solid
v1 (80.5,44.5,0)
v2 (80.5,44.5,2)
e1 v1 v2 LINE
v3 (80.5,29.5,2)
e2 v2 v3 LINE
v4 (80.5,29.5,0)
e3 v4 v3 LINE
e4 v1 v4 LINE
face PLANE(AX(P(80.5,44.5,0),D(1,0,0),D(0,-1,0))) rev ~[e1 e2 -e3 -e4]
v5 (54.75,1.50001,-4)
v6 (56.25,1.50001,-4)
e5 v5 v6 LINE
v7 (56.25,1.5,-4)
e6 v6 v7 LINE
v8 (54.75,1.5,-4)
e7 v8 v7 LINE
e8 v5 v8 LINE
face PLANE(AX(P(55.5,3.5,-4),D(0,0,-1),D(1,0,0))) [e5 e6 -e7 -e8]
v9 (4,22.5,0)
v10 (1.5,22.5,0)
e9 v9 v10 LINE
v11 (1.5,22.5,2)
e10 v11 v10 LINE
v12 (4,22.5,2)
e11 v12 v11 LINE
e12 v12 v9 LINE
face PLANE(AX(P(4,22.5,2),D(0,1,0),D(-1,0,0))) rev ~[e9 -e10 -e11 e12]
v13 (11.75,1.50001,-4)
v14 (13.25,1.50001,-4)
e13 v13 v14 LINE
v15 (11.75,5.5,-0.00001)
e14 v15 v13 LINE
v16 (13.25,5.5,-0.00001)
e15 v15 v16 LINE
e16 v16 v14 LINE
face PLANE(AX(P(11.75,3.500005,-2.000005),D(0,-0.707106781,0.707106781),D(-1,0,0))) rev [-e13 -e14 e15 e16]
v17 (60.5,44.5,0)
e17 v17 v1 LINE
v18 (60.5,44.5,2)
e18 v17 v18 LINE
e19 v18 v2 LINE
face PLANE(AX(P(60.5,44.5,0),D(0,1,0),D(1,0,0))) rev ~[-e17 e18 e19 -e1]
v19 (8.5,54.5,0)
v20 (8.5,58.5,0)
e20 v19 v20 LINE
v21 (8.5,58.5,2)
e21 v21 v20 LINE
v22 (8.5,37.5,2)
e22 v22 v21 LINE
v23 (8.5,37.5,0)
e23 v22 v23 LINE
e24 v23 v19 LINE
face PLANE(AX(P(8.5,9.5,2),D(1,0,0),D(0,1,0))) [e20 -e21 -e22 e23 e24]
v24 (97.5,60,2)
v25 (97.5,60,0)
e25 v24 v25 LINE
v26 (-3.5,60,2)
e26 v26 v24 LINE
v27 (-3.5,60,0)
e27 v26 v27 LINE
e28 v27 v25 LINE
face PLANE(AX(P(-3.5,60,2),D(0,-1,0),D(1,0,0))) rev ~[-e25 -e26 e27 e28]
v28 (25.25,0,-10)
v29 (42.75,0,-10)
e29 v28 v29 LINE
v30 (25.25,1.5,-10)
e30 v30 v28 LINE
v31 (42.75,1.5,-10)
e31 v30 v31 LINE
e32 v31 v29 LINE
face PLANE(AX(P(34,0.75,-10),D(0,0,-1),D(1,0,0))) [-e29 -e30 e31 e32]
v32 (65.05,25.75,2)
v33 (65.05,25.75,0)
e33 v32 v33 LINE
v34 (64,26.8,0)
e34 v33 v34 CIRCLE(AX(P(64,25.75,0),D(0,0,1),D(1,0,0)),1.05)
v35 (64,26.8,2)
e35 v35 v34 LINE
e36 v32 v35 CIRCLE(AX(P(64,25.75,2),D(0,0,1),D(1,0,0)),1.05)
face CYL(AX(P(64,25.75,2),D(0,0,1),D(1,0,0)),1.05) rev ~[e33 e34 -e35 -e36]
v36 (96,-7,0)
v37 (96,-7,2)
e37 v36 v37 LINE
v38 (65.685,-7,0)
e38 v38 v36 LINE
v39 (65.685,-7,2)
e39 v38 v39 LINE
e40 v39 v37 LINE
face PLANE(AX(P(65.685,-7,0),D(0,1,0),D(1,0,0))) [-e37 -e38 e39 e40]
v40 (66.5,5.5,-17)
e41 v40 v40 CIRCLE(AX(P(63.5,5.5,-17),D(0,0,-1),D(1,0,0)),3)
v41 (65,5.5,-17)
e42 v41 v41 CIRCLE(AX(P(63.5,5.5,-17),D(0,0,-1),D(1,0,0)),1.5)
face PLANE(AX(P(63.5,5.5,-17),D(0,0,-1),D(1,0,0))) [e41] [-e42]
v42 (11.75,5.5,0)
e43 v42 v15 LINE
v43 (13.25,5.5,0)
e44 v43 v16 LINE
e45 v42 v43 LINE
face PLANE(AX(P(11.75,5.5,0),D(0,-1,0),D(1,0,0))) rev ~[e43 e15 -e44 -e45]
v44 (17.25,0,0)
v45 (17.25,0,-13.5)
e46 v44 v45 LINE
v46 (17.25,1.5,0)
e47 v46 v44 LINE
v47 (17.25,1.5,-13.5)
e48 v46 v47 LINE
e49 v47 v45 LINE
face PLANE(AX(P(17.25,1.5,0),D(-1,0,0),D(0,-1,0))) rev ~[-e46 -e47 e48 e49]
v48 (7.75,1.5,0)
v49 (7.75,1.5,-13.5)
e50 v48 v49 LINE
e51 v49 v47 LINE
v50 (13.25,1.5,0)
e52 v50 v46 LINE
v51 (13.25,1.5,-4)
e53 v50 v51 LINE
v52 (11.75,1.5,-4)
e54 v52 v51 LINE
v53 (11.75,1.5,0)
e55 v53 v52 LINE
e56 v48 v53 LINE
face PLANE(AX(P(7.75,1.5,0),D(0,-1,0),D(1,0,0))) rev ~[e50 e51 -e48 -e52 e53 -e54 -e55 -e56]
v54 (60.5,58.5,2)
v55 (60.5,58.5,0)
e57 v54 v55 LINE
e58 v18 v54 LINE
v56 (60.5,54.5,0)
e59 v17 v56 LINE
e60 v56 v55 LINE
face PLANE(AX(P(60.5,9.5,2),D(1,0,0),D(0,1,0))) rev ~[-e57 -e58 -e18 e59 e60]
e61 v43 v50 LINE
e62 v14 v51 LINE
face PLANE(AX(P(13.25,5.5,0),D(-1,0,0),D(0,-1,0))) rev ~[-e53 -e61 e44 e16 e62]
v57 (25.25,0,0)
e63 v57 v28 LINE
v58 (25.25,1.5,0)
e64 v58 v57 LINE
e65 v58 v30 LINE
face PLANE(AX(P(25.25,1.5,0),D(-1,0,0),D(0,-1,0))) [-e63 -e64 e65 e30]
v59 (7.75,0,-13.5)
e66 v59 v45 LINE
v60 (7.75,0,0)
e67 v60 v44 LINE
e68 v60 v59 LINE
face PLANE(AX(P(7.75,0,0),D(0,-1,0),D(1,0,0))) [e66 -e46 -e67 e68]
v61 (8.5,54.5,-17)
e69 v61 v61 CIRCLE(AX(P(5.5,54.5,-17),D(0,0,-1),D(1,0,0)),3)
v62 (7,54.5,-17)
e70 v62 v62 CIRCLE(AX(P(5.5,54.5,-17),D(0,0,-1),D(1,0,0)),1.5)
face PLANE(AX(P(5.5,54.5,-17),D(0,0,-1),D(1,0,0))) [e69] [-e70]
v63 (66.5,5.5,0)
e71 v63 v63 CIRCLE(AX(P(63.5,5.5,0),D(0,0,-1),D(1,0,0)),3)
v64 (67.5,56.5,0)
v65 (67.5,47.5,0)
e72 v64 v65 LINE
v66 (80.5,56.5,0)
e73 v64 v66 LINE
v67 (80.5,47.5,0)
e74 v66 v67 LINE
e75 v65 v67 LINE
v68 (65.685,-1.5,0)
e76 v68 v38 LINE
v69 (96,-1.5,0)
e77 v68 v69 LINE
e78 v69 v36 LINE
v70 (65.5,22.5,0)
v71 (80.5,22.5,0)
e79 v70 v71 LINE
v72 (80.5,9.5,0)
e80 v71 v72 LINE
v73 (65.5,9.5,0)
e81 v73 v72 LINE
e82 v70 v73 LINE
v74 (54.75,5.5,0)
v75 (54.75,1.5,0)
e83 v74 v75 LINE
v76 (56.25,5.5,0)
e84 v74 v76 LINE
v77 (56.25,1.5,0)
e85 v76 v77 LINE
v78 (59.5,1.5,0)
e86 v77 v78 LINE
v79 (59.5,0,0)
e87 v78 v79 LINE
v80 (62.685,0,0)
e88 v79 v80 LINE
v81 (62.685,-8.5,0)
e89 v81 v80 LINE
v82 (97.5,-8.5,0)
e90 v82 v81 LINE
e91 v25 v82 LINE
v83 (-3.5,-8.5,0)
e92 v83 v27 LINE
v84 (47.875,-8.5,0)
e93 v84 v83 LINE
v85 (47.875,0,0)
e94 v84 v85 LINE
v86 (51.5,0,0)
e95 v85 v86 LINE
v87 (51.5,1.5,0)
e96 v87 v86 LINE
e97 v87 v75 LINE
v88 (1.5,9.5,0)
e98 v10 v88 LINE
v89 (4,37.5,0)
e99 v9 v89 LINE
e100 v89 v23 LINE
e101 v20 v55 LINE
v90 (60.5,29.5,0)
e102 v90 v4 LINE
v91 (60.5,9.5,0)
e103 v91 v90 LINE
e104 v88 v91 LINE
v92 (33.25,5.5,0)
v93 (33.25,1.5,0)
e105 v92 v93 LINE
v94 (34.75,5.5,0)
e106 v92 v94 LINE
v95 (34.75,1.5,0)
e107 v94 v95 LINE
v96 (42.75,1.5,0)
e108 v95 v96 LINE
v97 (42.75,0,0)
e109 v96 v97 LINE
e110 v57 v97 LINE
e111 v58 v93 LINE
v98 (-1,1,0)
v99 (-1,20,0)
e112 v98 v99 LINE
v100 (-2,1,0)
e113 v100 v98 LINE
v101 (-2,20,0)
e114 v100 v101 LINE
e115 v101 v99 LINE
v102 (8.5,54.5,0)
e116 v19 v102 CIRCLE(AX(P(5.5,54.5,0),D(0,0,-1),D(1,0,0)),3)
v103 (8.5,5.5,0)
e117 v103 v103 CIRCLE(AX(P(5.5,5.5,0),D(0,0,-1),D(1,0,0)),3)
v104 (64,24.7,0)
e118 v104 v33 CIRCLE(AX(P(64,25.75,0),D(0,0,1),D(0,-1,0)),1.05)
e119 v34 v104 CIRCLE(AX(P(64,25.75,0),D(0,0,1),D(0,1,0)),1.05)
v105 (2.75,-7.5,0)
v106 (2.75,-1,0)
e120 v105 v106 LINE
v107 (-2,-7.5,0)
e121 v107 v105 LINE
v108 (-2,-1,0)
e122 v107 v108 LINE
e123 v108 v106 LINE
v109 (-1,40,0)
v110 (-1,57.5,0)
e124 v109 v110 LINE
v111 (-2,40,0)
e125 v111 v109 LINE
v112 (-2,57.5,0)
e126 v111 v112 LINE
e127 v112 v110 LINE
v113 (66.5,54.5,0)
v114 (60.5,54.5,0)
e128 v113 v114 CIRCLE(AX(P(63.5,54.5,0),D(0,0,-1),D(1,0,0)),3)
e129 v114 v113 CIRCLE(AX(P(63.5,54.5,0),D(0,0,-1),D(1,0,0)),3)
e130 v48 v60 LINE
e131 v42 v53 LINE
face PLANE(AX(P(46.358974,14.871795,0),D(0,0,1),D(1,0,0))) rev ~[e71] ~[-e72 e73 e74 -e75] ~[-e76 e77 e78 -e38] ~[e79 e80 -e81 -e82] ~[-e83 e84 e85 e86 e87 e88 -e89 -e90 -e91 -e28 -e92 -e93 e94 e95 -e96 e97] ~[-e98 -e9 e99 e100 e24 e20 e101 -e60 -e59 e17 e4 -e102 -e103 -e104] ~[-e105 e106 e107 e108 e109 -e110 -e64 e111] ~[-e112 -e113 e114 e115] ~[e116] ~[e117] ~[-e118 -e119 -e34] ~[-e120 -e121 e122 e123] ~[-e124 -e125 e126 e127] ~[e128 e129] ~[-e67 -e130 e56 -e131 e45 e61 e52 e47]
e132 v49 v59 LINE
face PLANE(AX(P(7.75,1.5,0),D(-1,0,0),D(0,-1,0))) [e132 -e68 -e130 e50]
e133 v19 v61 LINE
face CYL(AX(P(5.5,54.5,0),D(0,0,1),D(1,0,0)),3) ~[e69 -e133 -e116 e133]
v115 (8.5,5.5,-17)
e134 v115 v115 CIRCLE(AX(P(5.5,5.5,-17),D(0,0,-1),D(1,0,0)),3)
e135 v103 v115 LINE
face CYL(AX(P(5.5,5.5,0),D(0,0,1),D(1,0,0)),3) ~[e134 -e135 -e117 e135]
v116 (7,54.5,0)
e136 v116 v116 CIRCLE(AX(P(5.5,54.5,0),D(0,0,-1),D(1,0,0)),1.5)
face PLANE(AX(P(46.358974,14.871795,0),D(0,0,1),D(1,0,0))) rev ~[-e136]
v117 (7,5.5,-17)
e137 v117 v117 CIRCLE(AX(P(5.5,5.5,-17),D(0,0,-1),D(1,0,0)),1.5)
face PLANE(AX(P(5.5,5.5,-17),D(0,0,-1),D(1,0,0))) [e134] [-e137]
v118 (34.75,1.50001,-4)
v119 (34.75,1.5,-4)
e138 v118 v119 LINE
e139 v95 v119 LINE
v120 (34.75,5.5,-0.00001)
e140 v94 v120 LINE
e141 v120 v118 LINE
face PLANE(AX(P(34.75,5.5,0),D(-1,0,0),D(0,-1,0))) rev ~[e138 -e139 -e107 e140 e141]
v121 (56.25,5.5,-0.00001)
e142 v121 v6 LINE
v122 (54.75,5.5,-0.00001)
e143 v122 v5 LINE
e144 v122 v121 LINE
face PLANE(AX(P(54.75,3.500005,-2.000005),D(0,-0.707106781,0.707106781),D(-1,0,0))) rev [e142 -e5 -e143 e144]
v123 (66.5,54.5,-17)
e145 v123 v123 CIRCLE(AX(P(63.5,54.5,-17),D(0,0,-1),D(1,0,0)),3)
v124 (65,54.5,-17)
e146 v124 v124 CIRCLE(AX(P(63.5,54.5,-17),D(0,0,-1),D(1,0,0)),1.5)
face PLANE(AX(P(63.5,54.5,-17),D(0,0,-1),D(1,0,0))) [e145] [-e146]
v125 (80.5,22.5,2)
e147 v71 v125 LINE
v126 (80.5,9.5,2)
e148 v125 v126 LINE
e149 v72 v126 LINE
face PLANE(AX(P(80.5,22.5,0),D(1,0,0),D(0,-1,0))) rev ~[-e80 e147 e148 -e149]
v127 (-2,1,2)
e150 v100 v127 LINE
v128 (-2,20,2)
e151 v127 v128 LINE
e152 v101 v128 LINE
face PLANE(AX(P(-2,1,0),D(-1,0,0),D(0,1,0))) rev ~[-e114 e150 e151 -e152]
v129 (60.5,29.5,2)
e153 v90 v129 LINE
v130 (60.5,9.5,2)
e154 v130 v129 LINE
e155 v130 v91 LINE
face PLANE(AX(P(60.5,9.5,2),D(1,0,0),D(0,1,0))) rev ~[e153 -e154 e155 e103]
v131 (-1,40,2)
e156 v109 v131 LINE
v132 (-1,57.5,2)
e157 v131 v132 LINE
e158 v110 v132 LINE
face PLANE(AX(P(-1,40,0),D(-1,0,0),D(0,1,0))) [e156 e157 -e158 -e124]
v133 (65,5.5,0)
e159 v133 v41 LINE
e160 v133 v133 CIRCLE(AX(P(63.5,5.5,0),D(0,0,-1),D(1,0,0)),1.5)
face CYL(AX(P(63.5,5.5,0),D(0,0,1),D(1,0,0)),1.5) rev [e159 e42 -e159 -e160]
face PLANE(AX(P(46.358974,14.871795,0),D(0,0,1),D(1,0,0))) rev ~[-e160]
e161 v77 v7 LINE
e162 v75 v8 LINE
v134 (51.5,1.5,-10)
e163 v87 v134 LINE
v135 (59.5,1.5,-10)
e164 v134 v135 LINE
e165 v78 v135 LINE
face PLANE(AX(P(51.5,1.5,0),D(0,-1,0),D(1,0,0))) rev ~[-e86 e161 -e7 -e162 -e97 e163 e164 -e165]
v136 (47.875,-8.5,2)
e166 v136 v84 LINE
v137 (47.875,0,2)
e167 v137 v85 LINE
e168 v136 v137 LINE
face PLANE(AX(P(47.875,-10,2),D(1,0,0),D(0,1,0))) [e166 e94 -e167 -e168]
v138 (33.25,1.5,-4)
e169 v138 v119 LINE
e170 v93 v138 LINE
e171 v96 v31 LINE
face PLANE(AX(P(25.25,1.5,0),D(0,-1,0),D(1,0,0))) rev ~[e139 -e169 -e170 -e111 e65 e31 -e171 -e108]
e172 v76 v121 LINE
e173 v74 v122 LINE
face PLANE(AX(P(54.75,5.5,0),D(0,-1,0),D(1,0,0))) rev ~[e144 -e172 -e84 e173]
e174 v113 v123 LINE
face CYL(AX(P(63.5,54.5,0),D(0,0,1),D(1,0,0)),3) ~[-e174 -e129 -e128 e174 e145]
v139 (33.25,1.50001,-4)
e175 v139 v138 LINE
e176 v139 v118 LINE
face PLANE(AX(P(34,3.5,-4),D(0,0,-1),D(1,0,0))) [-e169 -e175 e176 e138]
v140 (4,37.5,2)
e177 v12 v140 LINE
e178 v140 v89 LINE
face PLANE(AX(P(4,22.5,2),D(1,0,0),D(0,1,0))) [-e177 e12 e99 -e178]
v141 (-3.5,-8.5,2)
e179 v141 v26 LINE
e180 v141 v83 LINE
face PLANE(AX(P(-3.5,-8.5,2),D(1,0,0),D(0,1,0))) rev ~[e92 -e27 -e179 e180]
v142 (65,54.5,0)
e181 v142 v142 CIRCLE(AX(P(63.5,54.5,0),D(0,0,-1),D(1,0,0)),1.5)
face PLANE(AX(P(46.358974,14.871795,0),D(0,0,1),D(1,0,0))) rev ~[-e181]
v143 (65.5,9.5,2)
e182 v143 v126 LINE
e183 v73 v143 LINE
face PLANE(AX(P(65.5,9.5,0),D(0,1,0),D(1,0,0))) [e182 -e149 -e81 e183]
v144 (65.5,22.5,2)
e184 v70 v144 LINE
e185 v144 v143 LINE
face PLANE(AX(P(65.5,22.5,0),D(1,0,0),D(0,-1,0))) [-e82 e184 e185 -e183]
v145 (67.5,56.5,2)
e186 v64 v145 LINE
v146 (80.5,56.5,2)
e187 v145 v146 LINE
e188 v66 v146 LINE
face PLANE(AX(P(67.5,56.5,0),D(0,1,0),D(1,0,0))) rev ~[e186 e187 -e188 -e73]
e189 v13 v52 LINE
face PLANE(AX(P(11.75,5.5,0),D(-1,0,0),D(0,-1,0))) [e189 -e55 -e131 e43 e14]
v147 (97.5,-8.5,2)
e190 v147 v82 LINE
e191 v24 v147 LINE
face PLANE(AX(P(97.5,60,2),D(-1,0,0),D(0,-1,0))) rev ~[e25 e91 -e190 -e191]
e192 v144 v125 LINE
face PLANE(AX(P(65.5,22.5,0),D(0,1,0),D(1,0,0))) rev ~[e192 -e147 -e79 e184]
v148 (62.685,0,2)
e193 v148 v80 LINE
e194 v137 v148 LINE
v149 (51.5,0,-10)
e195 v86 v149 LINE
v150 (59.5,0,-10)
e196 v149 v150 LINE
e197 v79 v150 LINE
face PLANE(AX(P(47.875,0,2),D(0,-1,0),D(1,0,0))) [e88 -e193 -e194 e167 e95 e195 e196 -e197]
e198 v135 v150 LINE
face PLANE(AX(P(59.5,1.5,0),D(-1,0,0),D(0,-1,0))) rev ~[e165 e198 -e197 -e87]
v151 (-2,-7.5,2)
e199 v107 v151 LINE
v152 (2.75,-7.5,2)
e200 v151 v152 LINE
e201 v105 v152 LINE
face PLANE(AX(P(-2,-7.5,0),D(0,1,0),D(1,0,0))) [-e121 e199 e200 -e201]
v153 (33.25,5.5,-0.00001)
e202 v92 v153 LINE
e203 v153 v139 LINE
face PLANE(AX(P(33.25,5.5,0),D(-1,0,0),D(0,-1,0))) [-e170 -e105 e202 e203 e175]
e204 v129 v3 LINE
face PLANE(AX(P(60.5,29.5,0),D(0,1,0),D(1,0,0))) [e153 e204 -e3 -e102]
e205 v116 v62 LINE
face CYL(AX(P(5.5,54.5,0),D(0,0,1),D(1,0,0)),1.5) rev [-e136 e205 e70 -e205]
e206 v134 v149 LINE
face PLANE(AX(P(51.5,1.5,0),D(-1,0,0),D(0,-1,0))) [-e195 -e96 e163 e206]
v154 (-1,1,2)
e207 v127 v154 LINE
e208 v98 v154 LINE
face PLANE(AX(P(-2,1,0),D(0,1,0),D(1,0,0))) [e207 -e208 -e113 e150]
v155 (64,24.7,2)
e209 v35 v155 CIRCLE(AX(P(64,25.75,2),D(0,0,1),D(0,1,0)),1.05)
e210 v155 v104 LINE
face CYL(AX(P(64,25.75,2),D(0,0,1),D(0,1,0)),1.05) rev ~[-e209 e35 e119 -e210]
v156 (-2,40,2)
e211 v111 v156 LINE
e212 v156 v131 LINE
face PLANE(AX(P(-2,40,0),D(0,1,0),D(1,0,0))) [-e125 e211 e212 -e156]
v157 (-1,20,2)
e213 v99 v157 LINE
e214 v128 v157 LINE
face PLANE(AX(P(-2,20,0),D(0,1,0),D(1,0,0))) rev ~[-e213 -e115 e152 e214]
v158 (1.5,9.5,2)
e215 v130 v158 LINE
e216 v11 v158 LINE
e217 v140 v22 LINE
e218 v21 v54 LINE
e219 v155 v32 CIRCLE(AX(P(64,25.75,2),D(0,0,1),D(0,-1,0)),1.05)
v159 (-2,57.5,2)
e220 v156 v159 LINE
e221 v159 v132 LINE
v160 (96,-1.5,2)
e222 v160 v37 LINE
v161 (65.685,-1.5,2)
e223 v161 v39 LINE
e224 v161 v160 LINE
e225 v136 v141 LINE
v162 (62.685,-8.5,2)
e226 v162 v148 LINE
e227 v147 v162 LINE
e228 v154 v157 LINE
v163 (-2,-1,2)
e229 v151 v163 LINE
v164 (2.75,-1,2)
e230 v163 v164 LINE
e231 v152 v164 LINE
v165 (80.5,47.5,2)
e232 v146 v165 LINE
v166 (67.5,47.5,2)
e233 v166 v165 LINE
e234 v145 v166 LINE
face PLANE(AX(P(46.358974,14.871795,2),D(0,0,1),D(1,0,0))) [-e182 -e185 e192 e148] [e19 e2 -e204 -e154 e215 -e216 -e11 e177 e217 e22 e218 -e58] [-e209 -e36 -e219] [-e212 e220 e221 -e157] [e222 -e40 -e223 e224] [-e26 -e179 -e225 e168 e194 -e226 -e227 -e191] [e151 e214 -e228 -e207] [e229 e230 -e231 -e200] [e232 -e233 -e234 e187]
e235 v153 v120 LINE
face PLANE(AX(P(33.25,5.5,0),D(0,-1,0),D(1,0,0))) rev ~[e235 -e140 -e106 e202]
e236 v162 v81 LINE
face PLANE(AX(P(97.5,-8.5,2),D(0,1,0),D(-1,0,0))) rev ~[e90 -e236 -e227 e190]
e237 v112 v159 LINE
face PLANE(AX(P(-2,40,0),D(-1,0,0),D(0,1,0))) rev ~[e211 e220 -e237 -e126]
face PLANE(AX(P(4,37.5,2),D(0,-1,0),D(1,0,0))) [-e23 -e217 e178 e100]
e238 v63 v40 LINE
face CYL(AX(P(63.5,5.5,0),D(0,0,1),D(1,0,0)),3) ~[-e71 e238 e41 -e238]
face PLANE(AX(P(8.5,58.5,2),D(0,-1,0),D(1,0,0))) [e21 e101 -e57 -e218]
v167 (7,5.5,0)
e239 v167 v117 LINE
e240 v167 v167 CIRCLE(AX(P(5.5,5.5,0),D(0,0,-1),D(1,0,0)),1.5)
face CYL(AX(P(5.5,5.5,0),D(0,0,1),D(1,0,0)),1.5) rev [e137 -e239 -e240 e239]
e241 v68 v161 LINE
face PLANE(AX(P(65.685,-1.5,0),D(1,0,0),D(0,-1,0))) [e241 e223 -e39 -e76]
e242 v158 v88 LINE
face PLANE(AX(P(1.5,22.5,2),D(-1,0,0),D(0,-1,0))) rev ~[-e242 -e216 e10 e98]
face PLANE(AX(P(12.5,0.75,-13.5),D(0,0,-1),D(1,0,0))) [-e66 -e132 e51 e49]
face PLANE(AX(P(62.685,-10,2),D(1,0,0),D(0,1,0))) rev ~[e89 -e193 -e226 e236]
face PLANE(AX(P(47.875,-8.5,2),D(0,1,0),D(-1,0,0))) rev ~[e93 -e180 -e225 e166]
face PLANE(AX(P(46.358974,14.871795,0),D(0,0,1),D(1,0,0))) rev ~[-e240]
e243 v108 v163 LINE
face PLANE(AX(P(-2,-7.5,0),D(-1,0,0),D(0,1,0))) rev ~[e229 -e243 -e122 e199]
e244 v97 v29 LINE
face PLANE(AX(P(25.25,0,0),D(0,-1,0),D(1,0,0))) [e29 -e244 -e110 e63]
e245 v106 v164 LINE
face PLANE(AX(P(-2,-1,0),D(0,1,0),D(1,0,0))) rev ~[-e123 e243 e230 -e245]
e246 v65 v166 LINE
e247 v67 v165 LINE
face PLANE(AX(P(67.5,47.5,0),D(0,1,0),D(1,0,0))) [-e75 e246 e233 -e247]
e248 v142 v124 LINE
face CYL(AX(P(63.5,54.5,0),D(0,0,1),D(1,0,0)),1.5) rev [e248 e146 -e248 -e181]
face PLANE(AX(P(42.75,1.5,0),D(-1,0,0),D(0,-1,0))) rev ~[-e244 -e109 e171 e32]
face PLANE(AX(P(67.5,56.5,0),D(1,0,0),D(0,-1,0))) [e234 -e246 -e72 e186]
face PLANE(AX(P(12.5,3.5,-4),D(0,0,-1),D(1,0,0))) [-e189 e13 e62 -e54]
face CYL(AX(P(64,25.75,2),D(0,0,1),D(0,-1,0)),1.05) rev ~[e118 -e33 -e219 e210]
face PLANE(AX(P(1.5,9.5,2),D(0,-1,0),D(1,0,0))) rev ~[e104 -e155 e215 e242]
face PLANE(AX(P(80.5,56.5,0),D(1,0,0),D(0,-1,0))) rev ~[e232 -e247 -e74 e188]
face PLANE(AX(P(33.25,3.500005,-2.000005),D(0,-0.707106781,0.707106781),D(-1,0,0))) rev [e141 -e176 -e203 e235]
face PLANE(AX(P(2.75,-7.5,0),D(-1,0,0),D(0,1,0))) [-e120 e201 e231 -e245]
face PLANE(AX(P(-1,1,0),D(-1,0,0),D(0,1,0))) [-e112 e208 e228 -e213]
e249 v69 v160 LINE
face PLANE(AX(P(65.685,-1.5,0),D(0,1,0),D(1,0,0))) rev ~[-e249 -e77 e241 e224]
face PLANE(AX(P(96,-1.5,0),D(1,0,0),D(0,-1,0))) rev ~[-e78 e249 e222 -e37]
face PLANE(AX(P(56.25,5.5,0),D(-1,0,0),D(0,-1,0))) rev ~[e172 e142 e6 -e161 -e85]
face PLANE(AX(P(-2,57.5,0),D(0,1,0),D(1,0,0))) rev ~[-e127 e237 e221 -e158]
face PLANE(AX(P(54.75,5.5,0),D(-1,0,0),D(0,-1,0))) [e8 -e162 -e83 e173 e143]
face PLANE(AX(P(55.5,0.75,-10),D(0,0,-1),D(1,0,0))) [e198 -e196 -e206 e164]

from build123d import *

# Parameters (mm, degrees)
F0_W      = 89
F0_H      = 60
F1_DEPTH  = 2
F2_R      = 3
F2_R_2    = 1.5
F3_DEPTH  = 17
F4_W      = 52
F4_H      = 49
F5_DEPTH  = 2
F6_W      = 4.5
F6_H      = 15
F7_DEPTH  = 2
F8_W      = 14.81
F8_H      = 10
F9_DEPTH  = 2
F11_W     = 17.5
F11_H     = 1.5
F11_W_2   = 8
F12_DEPTH = 10
F11_W_3   = 9.5
F13_DEPTH = 13.5
F14_W     = 1.5
F14_H     = 4
F15_DEPTH = 4
F16_SIZE  = 3.99999
F17_W     = 20
F17_H     = 15
F18_DEPTH = 2
F19_W     = 15
F19_H     = 13
F19_W_2   = 30.315
F19_H_2   = 5.5
F19_W_3   = 13
F19_H_3   = 9
F20_DEPTH = 2
F22_W     = 4.75
F22_H     = 6.5
F22_W_2   = 1
F22_H_2   = 19
F22_H_3   = 17.5
F23_DEPTH = 2
F25_DEPTH = 2
F21_R     = 1.05
F26_DEPTH = 2


# Not quite as in the source:
# - a fillet or chamfer is up to 0.001 mm smaller than in the source, because OpenCascade refuses the exact size
# - a feature of the source that left no trace in its solid (it failed there, or was rolled back) is left out


with BuildPart() as f1:
    # F0 (on Top) → F1 (new body)
    with BuildSketch(Plane.XY):
        Polygon((89, 0), (0, 0), (0, 60), (-5, 60), (-5, 0), (-5, -10), (89, -10), (99, -10), (99, 60), (89, 60), align=None)
        Polygon((-5, 60), (0, 60), (89, 60), (99, 60), (99, 61.5), (-5, 61.5), align=None)
        with Locations((44.5, 30)):
            Rectangle(F0_W, F0_H)
    extrude(amount=F1_DEPTH)

    # F2 (on face) → F3 (join)
    with BuildSketch(Plane(origin=(0, 0, 0), x_dir=(1, 0, 0), z_dir=(0, 0, -1))):
        with Locations((5.5, -5.5)):
            Circle(F2_R)
        with Locations((5.5, -5.5)):
            Circle(F2_R_2, mode=Mode.SUBTRACT)
        with Locations((63.5, -5.5)):
            Circle(F2_R)
        with Locations((63.5, -5.5)):
            Circle(F2_R_2, mode=Mode.SUBTRACT)
        with Locations((5.5, -54.5)):
            Circle(F2_R)
        with Locations((5.5, -54.5)):
            Circle(F2_R_2, mode=Mode.SUBTRACT)
        with Locations((63.5, -54.5)):
            Circle(F2_R)
        with Locations((63.5, -54.5)):
            Circle(F2_R_2, mode=Mode.SUBTRACT)
    extrude(amount=F3_DEPTH)

    # F4 (on face) → F5 (cut, through all)
    with BuildSketch(Plane.XY.offset(2)):
        with Locations((34.5, 34)):
            Rectangle(F4_W, F4_H)
    extrude(amount=-F5_DEPTH, mode=Mode.SUBTRACT)

    # F6 (on face) → F7 (cut, through all)
    with BuildSketch(Plane.XY.offset(2)):
        with Locations((6.25, 30)):
            Rectangle(F6_W, F6_H)
        Polygon((8.5, 9.5), (8.5, 22.5), (4, 22.5), (1.5, 22.5), (1.5, 9.5), align=None)
    extrude(amount=-F7_DEPTH, mode=Mode.SUBTRACT)

    # F8 (on face) → F9 (cut, through all)
    with BuildSketch(Plane.XY.offset(2)):
        with Locations((55.28, -5)):
            Rectangle(F8_W, F8_H)
    extrude(amount=-F9_DEPTH, mode=Mode.SUBTRACT)

    # F11 (on face) → F12 (join)
    with BuildSketch(Plane(origin=(0, 0, 0), x_dir=(1, 0, 0), z_dir=(0, 0, -1))):
        with Locations((34, -0.75)):
            Rectangle(F11_W, F11_H)
        with Locations((55.5, -0.75)):
            Rectangle(F11_W_2, F11_H)
    extrude(amount=F12_DEPTH)

    # F11 (on face) → F13 (join)
    with BuildSketch(Plane(origin=(0, 0, 0), x_dir=(1, 0, 0), z_dir=(0, 0, -1))):
        with Locations((12.5, -0.75)):
            Rectangle(F11_W_3, F11_H)
    extrude(amount=F13_DEPTH)

    # F14 (on face) → F15 (join)
    with BuildSketch(Plane(origin=(0, 0, 0), x_dir=(1, 0, 0), z_dir=(0, 0, -1))):
        with Locations((34, -3.5)):
            Rectangle(F14_W, F14_H)
        with Locations((55.5, -3.5)):
            Rectangle(F14_W, F14_H)
        with Locations((12.5, -3.5)):
            Rectangle(F14_W, F14_H)
    extrude(amount=F15_DEPTH)

    # F16 (size 4 in the source; OpenCascade refuses exactly that, so slightly less here)
    f16_edges = [f1.edges().sort_by_distance(p)[0] for p in [
        (12.5, 5.5, -4),
        (34, 5.5, -4),
        (55.5, 5.5, -4),
    ]]
    chamfer(f16_edges, length=F16_SIZE)

    # F17 (on face) → F18 (cut, through all)
    with BuildSketch(Plane(origin=(0, 0, 0), x_dir=(1, 0, 0), z_dir=(0, 0, -1))):
        with Locations((70.5, -37)):
            Rectangle(F17_W, F17_H)
    extrude(amount=-F18_DEPTH, mode=Mode.SUBTRACT)

    # F19 (on face) → F20 (cut, through all)
    with BuildSketch(Plane(origin=(0, 0, 0), x_dir=(1, 0, 0), z_dir=(0, 0, -1))):
        with Locations((73, -16)):
            Rectangle(F19_W, F19_H)
        with Locations((80.8425, 4.25)):
            Rectangle(F19_W_2, F19_H_2)
        with Locations((74, -52)):
            Rectangle(F19_W_3, F19_H_3)
    extrude(amount=-F20_DEPTH, mode=Mode.SUBTRACT)

    # F22 (on face) → F23 (cut, through all)
    with BuildSketch(Plane.XY):
        with Locations((0.375, -4.25)):
            Rectangle(F22_W, F22_H)
        with Locations((-1.5, 10.5)):
            Rectangle(F22_W_2, F22_H_2)
        with Locations((-1.5, 48.75)):
            Rectangle(F22_W_2, F22_H_3)
    extrude(amount=F23_DEPTH, mode=Mode.SUBTRACT)

    # F24 (on face) → F25 (cut, through all)
    with BuildSketch(Plane.XY.offset(2)):
        Polygon((-3.5, -8.5), (-3.5, 60), (97.5, 60), (97.5, -8.5), (62.685, -8.5), (62.685, -10), (99, -10), (99, 61.5), (-5, 61.5), (-5, -10), (47.875, -10), (47.875, -8.5), align=None)
    extrude(amount=-F25_DEPTH, mode=Mode.SUBTRACT)

    # F21 (on face) → F26 (cut, through all)
    with BuildSketch(Plane.XY.offset(2)):
        with BuildLine():
            ThreePointArc((64, 24.7), (64.7424621202, 25.0075378798), (65.05, 25.75))
            ThreePointArc((65.05, 25.75), (64.7424621202, 26.4924621202), (64, 26.8))
            Line((64, 26.8), (64, 25.75))
            Line((64, 25.75), (64, 24.7))
        make_face()
        with BuildLine():
            Line((64, 25.75), (64, 26.8))
            ThreePointArc((64, 26.8), (62.95, 25.75), (64, 24.7))
            Line((64, 24.7), (64, 25.75))
        make_face()
        with Locations((44, 14.5)):
            Circle(F21_R)
    extrude(amount=-F26_DEPTH, mode=Mode.SUBTRACT)


solid = f1.part
